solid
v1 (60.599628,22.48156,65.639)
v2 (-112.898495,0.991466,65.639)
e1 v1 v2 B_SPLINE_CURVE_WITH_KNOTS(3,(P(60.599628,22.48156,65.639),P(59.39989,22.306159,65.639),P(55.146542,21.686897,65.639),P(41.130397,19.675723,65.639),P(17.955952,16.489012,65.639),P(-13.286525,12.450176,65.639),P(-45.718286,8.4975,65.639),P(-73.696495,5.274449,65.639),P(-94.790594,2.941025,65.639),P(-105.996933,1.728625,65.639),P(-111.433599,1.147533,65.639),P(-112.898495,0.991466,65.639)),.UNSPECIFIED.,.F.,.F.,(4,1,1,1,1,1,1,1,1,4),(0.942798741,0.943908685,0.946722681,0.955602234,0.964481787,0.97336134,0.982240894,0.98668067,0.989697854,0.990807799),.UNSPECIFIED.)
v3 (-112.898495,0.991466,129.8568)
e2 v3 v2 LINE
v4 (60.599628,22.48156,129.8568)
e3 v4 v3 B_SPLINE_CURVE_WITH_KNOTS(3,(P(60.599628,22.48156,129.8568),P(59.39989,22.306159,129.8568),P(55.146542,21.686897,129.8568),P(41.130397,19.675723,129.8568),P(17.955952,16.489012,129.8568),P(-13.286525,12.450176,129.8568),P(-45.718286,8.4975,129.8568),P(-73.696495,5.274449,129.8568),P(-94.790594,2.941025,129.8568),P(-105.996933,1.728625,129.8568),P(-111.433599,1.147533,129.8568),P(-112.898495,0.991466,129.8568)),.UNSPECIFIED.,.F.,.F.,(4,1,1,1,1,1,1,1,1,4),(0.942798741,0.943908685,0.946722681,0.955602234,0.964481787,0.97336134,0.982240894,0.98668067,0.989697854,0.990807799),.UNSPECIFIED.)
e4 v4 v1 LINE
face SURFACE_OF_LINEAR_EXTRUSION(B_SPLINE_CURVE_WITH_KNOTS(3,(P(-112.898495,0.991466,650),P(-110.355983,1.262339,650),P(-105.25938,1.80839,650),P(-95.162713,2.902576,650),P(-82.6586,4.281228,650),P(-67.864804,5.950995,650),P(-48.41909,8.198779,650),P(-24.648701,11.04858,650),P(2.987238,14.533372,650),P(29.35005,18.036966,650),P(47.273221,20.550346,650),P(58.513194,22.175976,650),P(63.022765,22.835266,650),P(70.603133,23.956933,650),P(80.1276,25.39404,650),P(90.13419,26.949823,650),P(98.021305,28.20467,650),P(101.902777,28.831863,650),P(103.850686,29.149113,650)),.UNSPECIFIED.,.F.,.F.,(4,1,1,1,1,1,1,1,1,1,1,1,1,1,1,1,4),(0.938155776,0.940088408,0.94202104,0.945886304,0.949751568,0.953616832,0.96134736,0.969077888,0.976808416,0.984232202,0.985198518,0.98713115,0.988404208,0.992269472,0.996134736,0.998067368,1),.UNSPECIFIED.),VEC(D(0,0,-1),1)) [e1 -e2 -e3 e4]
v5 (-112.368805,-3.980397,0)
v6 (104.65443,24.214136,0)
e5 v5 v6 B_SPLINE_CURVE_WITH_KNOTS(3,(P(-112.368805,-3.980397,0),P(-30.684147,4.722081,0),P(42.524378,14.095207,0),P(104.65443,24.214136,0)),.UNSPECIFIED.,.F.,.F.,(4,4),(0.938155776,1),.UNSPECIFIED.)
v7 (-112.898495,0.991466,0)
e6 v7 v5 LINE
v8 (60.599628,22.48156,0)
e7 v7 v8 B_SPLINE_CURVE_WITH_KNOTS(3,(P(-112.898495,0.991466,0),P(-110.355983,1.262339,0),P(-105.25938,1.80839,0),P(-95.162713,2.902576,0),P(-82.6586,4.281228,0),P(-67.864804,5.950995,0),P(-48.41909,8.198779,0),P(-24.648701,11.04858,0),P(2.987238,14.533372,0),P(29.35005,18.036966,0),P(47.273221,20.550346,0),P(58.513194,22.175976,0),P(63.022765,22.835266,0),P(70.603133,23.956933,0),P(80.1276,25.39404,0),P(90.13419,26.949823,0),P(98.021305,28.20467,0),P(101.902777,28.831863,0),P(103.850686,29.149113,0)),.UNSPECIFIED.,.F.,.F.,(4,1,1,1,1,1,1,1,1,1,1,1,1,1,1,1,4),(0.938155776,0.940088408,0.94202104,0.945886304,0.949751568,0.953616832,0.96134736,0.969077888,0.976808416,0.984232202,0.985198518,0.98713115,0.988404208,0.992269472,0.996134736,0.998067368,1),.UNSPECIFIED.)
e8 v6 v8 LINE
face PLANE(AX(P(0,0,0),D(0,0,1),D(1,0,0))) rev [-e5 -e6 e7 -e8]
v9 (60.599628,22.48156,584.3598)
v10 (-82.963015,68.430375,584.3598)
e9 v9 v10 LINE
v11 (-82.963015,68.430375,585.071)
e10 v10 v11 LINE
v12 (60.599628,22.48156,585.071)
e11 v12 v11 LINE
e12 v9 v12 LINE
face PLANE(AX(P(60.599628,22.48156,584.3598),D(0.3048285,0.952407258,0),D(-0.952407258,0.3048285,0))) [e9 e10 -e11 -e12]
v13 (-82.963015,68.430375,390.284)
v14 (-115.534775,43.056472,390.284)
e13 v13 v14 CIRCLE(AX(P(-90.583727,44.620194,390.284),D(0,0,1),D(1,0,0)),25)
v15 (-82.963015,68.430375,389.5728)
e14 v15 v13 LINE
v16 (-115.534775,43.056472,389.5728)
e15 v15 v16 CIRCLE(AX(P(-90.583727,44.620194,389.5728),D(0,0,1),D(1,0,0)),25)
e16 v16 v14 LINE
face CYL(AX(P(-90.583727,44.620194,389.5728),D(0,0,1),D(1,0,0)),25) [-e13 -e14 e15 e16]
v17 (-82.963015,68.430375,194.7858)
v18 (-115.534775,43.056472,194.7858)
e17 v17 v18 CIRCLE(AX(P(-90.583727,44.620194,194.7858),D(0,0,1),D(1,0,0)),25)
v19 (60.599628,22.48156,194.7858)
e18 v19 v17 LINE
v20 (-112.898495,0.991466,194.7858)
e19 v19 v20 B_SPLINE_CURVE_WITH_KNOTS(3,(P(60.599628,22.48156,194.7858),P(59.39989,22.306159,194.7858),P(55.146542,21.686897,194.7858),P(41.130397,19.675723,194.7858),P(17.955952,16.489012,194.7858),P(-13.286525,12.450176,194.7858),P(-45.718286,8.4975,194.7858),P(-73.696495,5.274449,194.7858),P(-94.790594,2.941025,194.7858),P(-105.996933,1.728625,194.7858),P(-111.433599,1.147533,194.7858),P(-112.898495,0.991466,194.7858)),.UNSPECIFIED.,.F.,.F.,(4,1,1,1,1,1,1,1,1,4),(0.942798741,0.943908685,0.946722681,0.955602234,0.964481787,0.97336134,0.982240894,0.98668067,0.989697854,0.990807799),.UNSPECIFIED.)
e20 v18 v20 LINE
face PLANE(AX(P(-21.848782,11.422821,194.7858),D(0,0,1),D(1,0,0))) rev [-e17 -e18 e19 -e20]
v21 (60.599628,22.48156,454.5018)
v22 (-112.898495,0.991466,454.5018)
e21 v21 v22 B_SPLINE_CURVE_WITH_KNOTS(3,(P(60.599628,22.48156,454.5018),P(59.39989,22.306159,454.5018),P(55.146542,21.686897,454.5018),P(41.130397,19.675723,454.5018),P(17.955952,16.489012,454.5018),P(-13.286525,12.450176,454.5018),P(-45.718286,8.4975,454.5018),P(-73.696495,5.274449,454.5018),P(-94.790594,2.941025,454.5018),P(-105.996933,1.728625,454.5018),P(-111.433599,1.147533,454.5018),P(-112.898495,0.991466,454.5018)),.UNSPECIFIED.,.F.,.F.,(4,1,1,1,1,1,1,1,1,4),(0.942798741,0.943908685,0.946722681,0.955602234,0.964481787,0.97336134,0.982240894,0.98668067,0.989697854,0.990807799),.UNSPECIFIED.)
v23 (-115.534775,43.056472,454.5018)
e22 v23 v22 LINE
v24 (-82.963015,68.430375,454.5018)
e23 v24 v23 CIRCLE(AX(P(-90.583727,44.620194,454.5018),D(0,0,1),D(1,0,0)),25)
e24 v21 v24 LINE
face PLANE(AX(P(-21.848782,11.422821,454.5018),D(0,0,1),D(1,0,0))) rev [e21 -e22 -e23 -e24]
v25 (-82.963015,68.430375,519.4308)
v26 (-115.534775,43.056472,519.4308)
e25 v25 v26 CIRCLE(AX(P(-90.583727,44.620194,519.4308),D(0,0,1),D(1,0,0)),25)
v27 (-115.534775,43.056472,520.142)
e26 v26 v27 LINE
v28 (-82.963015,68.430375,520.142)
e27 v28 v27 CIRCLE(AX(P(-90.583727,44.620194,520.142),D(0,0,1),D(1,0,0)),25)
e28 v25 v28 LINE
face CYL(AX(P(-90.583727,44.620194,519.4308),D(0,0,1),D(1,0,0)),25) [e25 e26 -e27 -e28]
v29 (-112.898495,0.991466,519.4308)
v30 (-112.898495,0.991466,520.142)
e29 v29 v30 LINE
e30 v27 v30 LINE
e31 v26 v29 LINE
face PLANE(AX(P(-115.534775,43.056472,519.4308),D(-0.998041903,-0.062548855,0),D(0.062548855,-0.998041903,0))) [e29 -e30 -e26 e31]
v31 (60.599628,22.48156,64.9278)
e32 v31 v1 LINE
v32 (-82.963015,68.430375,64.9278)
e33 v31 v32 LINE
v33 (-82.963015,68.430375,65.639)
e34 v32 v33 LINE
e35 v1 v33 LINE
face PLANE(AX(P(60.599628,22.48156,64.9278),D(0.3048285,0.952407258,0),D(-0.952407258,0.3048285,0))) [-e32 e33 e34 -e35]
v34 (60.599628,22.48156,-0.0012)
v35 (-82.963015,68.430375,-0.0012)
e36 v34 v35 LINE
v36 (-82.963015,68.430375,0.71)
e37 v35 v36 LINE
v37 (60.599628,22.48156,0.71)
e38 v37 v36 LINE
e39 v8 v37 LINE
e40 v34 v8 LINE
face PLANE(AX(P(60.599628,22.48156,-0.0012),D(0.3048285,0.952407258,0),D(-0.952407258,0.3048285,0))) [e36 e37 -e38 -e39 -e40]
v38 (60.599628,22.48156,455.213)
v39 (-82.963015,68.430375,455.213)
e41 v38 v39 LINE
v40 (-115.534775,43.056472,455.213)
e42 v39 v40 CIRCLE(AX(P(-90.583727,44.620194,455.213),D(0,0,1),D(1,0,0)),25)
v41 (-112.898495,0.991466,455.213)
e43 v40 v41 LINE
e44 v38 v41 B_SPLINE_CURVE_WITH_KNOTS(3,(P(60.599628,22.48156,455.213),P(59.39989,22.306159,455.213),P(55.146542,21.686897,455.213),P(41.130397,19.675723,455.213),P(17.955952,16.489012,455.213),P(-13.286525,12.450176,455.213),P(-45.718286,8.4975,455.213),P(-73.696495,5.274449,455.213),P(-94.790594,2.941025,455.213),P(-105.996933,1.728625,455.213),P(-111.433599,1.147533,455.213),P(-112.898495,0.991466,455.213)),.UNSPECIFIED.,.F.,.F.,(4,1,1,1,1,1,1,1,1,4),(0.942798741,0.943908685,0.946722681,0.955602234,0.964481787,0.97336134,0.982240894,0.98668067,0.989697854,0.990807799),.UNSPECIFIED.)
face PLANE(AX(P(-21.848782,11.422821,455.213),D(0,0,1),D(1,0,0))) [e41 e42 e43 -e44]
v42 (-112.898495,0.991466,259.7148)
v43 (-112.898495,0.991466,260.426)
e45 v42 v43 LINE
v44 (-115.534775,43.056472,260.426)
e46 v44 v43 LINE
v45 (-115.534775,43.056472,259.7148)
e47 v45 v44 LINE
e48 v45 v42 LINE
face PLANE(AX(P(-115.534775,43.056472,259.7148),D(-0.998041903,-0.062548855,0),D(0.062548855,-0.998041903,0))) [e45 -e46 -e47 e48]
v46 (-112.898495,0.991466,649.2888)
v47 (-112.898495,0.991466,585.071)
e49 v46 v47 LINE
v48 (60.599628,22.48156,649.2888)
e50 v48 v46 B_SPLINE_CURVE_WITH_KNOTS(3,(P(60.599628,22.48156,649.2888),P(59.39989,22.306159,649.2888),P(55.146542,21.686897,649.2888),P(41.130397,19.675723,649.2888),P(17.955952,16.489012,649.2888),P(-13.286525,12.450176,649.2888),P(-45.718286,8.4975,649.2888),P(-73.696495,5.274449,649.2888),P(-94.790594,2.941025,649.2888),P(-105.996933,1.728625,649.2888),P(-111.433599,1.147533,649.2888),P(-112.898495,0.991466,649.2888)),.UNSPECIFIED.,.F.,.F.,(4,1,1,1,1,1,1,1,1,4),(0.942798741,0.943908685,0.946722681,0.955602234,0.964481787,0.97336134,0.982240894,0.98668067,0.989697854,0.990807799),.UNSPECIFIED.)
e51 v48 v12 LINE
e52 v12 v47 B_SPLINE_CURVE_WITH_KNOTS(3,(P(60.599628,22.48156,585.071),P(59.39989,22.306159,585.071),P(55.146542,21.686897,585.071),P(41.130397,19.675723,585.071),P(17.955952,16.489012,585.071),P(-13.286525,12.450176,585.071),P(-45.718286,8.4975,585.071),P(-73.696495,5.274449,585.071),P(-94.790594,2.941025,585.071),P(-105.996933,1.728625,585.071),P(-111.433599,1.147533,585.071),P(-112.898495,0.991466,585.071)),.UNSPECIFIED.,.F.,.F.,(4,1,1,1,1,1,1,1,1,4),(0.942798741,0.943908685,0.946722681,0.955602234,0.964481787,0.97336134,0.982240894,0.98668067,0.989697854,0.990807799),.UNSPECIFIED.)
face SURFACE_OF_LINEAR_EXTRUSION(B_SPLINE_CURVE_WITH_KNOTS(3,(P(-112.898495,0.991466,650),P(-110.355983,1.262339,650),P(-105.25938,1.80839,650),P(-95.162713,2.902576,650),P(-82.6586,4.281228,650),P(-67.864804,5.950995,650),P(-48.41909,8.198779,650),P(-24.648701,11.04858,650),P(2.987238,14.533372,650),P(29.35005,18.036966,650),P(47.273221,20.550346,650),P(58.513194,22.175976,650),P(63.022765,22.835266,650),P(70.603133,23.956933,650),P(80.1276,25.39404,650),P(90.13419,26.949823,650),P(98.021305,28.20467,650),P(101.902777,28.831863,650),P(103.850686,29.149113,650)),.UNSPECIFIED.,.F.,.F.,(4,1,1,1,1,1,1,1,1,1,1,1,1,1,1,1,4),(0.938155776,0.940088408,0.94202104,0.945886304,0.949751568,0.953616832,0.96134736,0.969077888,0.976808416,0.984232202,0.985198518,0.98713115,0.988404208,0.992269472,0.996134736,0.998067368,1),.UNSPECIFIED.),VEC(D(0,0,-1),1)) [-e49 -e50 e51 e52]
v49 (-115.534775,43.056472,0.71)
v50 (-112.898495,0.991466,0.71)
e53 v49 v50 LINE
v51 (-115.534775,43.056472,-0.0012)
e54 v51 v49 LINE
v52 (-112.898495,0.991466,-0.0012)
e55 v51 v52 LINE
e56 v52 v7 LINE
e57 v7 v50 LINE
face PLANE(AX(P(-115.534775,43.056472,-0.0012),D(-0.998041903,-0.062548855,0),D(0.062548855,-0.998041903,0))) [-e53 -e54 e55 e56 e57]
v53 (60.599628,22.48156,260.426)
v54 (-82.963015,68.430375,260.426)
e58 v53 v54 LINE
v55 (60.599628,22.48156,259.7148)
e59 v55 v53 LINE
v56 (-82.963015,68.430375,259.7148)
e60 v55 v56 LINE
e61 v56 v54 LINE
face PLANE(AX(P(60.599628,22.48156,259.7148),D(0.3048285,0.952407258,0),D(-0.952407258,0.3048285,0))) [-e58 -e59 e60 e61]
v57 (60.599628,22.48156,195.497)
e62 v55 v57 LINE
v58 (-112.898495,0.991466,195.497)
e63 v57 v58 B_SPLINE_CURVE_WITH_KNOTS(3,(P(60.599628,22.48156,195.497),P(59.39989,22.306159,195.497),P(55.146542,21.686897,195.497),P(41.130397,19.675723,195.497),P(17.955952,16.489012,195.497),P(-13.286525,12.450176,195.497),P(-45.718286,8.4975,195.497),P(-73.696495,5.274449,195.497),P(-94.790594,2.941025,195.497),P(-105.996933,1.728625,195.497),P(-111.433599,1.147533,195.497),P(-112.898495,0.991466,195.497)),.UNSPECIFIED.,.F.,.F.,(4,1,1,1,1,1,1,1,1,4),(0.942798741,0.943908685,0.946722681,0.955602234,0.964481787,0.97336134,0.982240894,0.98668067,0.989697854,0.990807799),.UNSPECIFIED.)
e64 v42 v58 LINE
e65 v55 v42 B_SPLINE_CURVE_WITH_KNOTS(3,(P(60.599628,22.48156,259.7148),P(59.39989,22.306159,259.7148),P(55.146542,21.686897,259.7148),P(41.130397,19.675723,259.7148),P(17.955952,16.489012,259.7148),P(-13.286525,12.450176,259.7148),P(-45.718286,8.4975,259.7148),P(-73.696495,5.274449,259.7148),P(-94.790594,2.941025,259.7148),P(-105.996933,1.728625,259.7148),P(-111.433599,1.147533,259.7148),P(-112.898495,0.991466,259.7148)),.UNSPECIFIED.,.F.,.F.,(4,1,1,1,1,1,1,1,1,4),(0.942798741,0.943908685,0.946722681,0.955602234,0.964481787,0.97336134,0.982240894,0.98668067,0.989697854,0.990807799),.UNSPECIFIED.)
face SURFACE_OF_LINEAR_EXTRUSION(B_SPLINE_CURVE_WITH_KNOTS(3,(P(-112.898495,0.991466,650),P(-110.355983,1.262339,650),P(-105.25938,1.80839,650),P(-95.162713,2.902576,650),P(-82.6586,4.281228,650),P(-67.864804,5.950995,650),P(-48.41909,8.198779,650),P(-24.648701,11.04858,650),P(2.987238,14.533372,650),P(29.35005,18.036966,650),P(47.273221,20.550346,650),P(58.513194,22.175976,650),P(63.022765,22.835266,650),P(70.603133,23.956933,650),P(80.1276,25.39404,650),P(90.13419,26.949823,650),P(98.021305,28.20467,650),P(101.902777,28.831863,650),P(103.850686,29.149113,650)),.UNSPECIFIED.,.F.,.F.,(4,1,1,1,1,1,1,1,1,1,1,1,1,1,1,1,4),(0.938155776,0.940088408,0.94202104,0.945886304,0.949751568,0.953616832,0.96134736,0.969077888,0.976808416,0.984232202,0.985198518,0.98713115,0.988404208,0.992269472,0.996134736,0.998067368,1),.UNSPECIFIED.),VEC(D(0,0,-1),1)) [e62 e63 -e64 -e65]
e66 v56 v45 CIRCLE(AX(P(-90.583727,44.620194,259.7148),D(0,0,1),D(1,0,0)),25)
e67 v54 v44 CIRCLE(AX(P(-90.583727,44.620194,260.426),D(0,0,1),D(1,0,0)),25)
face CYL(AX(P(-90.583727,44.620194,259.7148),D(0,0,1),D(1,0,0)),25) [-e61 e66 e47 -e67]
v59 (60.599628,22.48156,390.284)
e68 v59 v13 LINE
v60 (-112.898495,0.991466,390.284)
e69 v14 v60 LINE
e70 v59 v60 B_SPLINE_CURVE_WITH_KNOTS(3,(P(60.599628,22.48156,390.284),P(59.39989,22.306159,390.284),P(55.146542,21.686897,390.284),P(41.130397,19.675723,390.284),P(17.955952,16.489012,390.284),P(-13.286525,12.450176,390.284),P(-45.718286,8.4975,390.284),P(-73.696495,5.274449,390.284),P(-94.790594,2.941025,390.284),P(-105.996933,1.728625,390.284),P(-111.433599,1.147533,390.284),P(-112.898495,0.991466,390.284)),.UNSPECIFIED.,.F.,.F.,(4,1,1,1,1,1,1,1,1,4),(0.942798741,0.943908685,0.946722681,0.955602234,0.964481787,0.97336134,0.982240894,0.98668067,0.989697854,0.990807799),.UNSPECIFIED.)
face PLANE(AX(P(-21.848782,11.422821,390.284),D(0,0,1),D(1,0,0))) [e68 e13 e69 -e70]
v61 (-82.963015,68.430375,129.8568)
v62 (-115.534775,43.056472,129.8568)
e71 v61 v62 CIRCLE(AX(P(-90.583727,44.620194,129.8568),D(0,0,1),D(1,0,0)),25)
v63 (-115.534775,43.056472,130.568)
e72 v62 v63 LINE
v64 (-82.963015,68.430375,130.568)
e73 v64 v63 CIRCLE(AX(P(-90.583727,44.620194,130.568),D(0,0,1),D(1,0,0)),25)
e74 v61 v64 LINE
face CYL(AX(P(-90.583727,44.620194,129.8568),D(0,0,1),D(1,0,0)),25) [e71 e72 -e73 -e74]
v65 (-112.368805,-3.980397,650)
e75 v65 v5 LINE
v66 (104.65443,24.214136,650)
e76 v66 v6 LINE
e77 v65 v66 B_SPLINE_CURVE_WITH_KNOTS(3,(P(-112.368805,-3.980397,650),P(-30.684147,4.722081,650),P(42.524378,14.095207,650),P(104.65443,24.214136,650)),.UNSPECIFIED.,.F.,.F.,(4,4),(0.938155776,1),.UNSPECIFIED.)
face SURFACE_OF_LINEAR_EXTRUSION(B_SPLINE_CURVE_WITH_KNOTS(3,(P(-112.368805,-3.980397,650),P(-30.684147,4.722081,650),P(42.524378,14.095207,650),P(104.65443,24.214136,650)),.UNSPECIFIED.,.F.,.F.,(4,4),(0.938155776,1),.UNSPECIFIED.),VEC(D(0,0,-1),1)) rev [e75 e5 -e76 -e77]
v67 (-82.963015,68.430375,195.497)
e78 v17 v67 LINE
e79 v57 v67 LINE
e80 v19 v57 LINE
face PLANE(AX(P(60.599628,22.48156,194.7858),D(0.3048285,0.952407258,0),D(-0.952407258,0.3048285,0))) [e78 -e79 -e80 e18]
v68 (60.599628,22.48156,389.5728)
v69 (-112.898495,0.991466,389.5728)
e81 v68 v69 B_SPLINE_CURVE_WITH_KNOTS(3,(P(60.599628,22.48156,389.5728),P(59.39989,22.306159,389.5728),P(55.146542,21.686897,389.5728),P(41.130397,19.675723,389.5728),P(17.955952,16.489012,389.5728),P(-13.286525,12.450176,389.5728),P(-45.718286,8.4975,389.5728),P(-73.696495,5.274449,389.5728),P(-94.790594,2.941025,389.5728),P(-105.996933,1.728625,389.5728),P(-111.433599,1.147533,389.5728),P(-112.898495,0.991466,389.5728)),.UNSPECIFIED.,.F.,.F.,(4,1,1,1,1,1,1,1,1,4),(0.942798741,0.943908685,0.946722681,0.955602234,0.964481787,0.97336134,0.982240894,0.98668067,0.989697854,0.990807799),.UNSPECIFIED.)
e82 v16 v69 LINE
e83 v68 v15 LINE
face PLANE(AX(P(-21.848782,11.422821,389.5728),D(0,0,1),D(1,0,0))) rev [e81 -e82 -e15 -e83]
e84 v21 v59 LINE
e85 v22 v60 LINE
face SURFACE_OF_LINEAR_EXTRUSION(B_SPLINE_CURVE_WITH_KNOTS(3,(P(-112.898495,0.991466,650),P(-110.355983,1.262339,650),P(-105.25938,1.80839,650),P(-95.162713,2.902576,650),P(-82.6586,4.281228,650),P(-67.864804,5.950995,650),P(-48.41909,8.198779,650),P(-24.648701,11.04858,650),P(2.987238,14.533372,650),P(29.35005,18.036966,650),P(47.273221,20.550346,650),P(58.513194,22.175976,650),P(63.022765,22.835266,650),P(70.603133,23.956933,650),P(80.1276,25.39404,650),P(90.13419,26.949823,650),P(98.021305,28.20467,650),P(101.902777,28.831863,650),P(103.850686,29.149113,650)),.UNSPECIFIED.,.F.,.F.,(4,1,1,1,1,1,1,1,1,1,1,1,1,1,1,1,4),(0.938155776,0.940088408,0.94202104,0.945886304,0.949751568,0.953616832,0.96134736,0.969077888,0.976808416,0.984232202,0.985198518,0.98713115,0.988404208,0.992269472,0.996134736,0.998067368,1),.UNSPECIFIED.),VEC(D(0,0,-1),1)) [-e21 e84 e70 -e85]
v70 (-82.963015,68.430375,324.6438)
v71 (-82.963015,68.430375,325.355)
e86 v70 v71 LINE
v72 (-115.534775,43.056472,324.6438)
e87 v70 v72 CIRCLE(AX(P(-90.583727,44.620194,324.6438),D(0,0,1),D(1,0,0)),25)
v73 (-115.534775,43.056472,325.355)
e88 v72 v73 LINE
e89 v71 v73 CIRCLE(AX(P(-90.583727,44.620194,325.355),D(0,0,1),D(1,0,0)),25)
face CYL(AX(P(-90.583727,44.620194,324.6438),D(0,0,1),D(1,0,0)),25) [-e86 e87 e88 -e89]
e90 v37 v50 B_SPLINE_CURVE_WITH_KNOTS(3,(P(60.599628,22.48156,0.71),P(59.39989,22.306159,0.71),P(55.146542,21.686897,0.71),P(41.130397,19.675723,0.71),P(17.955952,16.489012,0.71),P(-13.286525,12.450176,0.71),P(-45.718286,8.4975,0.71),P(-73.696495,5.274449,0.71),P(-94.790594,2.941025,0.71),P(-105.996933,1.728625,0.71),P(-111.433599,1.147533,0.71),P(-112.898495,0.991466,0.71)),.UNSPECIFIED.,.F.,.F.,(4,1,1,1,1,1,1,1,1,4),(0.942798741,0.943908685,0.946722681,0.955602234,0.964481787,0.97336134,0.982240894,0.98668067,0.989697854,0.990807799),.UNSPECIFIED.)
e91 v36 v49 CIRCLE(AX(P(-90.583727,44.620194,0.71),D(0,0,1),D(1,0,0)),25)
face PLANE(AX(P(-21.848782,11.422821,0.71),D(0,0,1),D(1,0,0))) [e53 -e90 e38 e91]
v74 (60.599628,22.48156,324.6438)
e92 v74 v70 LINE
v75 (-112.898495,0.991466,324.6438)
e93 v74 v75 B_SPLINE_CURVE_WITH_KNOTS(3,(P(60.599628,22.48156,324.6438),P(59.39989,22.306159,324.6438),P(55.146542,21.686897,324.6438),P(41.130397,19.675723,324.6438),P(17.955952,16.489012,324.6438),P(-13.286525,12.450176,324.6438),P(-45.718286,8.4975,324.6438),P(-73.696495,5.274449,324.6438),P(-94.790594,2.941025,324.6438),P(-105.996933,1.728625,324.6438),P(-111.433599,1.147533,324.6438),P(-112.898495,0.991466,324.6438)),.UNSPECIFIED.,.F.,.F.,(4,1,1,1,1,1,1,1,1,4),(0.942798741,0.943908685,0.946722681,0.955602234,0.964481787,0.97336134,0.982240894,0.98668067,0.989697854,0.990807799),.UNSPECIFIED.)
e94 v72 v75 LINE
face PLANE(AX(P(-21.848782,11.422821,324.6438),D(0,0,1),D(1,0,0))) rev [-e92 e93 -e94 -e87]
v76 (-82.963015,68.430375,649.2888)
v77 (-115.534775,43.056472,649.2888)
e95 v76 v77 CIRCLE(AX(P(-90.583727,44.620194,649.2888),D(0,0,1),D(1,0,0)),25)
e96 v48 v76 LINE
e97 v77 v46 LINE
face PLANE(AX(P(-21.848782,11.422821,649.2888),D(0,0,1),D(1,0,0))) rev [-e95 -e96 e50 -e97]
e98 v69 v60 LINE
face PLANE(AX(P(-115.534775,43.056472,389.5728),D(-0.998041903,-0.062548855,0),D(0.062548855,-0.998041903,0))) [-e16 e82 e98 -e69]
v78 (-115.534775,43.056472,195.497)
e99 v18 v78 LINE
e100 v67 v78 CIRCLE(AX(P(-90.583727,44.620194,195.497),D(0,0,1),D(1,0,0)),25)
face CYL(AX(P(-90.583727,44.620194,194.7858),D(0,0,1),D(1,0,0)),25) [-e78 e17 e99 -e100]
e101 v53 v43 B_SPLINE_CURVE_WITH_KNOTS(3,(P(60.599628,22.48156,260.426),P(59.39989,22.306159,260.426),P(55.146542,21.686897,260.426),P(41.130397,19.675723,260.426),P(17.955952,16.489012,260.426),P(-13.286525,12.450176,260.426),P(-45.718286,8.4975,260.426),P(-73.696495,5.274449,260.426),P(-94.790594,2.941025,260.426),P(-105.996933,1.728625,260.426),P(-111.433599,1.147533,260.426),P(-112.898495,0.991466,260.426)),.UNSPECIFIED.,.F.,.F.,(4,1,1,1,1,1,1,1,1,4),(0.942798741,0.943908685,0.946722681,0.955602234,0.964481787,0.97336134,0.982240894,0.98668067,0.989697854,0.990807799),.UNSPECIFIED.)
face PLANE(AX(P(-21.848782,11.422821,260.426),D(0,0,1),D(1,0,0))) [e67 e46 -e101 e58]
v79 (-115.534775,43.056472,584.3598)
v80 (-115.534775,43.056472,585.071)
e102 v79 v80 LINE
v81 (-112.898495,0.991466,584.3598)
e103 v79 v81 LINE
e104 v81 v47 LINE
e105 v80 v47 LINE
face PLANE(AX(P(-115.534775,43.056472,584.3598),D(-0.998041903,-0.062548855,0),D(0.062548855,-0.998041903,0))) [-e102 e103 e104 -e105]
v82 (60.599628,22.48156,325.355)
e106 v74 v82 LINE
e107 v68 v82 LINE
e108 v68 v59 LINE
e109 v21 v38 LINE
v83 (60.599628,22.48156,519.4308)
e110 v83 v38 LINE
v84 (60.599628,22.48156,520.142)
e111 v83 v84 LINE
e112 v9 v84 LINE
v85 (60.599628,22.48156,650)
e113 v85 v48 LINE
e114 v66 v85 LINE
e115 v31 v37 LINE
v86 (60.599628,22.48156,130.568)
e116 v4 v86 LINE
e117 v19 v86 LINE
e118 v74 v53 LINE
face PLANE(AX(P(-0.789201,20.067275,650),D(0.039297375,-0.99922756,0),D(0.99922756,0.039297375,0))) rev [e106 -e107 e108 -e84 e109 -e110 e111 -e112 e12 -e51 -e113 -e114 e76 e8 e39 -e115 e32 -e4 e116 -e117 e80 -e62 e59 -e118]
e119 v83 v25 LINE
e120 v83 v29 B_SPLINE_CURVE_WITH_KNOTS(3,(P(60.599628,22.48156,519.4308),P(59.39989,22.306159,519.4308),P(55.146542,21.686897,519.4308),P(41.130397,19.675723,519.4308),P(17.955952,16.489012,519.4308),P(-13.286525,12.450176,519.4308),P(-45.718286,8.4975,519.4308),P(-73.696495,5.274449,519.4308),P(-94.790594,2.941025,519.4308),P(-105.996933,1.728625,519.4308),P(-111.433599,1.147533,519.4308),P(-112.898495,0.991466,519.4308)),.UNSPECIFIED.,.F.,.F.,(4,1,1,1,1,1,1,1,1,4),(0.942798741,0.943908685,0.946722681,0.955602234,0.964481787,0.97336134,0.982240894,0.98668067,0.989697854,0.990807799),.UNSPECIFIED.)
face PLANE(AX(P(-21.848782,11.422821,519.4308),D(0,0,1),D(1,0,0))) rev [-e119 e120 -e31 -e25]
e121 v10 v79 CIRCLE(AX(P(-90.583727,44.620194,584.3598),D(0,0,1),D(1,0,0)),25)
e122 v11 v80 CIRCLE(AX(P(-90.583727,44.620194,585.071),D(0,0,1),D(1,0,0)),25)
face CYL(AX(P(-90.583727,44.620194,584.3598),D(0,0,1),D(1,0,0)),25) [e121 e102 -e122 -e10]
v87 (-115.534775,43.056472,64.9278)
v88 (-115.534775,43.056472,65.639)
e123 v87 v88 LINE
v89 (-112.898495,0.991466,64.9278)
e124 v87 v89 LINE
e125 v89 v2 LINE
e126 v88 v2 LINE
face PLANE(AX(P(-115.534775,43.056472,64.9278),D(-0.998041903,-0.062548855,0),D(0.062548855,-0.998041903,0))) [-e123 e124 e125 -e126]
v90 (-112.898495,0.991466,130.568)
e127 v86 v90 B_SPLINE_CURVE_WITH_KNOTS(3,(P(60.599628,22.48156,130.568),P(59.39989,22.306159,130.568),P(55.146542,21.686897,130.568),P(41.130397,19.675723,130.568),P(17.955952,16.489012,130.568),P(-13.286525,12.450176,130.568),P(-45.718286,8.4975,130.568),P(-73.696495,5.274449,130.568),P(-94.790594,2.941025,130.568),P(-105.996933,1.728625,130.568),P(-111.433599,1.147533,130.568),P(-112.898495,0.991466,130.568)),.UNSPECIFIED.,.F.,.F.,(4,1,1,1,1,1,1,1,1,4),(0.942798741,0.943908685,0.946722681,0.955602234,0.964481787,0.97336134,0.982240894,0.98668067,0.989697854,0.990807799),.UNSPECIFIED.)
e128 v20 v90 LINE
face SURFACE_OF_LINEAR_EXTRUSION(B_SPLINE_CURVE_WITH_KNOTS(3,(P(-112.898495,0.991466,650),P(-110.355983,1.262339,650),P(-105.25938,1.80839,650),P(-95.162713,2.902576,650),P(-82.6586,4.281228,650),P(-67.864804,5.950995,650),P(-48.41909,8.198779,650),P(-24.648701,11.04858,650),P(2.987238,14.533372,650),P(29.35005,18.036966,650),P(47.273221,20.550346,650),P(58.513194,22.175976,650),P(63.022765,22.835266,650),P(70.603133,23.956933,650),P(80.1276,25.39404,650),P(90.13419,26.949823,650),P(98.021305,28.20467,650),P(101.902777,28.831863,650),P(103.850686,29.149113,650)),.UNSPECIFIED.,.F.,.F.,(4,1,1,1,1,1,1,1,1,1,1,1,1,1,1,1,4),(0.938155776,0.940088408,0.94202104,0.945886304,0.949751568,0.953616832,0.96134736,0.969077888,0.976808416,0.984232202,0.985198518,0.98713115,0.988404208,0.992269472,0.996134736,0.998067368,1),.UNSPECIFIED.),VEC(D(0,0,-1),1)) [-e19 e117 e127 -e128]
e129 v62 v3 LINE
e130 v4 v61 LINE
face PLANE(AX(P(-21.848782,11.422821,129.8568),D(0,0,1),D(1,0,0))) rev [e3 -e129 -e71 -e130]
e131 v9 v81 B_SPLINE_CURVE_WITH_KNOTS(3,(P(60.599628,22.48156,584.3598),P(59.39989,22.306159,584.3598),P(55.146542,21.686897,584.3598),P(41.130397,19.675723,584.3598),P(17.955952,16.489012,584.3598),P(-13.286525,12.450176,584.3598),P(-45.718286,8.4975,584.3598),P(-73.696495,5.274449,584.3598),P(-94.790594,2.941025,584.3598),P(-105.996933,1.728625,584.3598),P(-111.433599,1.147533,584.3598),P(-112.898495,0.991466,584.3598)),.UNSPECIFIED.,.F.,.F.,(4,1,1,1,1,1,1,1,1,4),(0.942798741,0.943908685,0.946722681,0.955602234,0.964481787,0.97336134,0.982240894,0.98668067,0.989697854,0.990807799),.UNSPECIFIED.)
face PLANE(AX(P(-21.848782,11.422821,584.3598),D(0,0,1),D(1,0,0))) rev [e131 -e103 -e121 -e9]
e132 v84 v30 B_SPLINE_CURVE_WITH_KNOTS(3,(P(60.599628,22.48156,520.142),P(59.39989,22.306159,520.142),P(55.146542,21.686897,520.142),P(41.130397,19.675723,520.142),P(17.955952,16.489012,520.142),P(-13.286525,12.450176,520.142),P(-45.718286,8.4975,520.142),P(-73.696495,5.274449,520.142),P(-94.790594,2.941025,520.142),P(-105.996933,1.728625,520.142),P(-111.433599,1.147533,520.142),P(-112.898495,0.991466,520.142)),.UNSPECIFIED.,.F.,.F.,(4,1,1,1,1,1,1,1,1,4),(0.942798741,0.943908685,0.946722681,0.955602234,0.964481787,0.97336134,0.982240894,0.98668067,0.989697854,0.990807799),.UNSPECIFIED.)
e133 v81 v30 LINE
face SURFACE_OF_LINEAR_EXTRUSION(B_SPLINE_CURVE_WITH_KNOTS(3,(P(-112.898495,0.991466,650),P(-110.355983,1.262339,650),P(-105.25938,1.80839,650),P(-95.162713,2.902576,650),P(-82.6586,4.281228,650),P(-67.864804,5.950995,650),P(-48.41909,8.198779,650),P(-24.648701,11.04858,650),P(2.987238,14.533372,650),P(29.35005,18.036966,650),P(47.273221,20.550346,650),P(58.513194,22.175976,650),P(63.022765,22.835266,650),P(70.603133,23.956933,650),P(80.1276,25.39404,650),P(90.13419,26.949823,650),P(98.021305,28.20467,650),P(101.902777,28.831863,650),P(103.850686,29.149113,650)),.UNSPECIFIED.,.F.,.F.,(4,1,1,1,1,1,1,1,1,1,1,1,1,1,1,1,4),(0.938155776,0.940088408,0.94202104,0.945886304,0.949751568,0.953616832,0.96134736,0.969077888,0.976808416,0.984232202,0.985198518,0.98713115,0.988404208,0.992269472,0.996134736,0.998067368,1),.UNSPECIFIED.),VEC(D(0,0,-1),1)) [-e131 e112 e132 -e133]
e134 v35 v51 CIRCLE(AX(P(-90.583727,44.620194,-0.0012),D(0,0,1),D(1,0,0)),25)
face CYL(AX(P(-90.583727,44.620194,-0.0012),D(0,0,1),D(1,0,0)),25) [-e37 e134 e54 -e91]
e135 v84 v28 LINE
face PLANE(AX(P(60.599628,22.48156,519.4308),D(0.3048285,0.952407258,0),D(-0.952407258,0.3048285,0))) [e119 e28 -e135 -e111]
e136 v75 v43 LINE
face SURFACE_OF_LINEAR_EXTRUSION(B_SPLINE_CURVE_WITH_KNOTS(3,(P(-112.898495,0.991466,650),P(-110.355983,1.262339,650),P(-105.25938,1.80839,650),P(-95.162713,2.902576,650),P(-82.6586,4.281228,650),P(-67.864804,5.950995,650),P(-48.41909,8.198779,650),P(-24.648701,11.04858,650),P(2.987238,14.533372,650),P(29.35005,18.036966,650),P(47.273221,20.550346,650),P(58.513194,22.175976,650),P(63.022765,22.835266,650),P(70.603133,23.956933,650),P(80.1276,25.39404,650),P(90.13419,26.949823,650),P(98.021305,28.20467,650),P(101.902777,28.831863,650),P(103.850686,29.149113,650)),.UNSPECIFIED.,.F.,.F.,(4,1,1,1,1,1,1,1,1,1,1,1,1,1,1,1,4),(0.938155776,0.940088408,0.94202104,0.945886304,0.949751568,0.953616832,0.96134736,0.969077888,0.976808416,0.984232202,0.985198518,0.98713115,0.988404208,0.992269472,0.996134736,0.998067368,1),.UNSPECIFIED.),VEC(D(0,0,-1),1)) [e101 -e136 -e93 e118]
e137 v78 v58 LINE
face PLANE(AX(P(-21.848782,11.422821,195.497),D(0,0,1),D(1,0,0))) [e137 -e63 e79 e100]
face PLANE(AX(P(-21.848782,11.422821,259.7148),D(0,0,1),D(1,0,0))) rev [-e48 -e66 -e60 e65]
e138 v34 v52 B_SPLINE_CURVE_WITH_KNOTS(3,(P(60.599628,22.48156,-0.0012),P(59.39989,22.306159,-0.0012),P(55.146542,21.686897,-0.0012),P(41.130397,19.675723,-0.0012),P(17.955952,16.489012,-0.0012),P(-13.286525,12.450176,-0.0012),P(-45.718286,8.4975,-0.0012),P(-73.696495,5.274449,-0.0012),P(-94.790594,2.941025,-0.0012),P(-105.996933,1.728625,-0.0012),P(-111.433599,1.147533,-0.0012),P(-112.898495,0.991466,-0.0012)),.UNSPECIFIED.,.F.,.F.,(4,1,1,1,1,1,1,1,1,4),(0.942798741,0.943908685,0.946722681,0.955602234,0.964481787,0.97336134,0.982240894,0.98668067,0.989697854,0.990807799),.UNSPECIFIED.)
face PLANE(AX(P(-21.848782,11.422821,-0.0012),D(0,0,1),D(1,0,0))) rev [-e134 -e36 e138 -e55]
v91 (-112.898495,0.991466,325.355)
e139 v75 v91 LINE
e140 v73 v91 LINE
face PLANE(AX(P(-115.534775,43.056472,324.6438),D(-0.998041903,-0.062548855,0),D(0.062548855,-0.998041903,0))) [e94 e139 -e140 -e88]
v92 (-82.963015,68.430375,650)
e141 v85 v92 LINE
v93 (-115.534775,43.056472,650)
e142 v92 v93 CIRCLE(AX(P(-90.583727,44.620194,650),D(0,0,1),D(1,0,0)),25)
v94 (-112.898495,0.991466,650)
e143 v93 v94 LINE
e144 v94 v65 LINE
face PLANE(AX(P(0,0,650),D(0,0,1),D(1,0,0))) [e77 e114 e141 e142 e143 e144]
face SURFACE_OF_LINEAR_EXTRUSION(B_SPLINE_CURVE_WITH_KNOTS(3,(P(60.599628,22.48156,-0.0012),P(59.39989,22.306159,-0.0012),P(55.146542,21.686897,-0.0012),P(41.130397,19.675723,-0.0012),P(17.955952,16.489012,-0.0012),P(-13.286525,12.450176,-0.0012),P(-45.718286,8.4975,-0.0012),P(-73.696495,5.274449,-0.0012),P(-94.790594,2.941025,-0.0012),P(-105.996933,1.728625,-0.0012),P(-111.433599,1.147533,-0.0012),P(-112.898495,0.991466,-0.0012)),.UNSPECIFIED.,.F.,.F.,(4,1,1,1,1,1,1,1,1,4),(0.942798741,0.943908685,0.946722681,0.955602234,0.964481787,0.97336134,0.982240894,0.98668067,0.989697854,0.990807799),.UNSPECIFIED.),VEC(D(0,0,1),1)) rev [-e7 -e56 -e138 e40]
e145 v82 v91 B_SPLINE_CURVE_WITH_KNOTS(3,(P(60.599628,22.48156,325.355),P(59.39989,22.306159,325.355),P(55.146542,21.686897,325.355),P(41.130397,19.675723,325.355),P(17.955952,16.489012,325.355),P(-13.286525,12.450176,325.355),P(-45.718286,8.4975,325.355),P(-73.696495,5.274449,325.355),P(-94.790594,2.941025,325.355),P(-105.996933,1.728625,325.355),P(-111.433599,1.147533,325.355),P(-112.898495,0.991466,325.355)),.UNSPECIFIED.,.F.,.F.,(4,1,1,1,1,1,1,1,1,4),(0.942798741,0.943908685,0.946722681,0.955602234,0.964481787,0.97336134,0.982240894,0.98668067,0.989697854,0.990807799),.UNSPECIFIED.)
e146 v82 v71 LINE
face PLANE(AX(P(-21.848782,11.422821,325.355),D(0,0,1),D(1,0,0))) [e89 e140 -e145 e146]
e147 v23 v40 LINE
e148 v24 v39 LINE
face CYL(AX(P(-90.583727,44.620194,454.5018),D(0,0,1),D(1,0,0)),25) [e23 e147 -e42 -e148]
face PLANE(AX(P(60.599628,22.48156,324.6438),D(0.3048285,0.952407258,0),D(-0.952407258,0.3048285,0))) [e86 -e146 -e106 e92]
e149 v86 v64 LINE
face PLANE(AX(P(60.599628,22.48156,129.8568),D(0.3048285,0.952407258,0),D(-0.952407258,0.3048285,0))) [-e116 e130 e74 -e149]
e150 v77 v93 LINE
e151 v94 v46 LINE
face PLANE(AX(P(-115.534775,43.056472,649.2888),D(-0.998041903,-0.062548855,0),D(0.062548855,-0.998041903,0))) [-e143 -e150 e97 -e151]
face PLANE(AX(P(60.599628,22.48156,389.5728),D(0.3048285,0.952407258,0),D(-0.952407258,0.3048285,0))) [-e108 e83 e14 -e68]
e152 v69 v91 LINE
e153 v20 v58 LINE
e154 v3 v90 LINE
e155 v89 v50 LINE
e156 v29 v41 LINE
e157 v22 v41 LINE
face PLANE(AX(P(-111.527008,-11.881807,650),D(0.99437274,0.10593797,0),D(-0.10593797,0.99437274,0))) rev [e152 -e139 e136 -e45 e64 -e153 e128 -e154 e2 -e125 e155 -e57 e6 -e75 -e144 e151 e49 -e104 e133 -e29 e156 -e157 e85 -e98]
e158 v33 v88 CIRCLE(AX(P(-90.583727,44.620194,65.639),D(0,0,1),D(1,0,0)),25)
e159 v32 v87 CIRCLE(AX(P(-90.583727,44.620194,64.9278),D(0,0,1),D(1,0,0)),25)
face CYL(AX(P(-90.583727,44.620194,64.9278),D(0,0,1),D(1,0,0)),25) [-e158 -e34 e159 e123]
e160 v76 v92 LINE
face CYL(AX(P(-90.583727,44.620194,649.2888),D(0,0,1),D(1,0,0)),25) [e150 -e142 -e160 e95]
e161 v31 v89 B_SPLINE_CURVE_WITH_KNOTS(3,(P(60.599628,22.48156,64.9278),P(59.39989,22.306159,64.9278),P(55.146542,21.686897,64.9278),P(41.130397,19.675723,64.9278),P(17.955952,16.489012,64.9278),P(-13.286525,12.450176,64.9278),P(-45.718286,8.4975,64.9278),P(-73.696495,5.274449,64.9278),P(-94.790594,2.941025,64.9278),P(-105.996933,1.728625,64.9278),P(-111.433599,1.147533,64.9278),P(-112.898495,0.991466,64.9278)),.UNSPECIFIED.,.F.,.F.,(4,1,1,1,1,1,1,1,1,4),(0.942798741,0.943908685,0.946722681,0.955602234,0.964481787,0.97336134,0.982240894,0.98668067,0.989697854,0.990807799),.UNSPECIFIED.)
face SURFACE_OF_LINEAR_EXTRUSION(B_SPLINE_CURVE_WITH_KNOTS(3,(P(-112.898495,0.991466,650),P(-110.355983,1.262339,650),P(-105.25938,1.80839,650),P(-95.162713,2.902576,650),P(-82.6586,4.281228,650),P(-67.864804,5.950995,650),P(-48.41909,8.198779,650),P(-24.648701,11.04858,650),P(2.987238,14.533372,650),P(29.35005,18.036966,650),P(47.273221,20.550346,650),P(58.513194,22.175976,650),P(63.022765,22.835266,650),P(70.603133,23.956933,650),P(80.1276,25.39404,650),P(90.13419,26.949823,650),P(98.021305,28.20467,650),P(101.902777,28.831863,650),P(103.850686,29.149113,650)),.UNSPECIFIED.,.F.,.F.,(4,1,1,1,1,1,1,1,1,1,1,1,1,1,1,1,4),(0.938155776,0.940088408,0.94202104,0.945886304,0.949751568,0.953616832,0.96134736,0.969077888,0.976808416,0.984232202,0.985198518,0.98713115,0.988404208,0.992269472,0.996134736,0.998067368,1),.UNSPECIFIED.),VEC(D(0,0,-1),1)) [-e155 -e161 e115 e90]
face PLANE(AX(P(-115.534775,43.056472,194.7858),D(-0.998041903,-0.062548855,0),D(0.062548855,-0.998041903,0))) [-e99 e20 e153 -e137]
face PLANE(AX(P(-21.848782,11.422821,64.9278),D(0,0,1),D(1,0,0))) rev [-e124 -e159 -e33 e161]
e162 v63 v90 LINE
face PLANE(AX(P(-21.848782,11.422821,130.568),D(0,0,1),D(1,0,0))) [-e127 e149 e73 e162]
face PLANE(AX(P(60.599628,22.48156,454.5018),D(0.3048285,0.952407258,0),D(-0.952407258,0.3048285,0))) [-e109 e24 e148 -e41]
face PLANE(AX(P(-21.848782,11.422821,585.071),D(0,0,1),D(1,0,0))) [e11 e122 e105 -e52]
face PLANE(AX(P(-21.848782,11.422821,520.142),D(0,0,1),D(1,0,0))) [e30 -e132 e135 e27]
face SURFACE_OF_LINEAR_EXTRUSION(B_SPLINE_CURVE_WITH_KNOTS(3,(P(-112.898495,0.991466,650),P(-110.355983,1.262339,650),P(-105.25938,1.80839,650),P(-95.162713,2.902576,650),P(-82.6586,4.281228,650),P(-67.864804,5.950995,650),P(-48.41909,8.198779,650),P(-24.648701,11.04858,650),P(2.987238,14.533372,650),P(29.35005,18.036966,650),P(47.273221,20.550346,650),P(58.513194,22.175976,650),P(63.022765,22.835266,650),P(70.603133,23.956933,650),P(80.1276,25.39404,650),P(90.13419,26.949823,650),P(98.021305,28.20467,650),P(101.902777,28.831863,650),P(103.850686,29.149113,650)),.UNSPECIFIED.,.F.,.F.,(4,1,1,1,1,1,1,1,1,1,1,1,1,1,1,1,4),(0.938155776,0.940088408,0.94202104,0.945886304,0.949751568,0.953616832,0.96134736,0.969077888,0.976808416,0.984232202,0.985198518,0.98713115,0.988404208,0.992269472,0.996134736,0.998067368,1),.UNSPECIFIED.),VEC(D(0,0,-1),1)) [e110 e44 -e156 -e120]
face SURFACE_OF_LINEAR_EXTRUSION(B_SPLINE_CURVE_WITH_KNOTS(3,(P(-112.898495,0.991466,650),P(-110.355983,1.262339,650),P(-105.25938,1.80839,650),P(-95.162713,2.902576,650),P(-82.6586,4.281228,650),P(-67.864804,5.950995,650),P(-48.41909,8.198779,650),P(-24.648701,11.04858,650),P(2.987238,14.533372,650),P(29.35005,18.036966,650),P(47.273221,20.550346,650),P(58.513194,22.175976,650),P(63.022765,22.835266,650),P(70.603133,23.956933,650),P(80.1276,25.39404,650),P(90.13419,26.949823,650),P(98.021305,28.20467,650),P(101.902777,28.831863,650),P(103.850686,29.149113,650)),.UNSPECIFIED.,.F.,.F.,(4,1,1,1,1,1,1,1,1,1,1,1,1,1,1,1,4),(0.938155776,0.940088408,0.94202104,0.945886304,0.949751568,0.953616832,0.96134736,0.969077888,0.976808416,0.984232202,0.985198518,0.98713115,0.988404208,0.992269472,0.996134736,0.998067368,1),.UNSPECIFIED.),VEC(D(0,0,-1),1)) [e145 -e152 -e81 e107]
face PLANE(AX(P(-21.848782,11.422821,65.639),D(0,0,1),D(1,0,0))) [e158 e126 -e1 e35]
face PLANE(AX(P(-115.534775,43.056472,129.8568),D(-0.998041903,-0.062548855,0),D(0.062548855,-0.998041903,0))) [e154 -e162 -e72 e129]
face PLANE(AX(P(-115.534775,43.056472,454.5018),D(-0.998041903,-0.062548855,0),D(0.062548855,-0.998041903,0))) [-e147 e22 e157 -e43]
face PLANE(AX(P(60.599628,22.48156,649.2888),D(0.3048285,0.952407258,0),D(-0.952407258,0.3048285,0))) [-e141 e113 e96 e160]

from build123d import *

# Parameters (mm, degrees)
BOSS_EXTRUDE1_DEPTH = 650
BOSS_EXTRUDE2_START = -0.7112
BOSS_EXTRUDE2_DEPTH = 0.7112
LPATTERN1_COUNT     = 11
LPATTERN1_PITCH     = 64.929


# Read off the part's stored shape, not the designer's step: Boss-Extrude2
with BuildPart() as part:
    # Sketch1 → Boss-Extrude1 (new body)
    with BuildSketch(Plane.XY):
        with BuildLine():
            add(Edge.make_bspline(
                [(-112.898494578, 0.99146631), (-110.355982987, 1.262339099), (-105.259380368, 1.808389528), (-95.162712882, 2.902575782), (-82.658600361, 4.281227817), (-67.864804262, 5.950995414), (-48.419089864, 8.198779354), (-24.648701462, 11.048580313), (2.987237789, 14.533371756), (29.350050206, 18.036965667), (47.273220771, 20.55034649), (57.461014612, 22.023800415), (59.555137323, 22.328856294), (60.599627559, 22.481560095)],
                knots=[0.938155776, 0.938155776, 0.938155776, 0.938155776, 0.940088408, 0.94202104, 0.945886304, 0.949751568, 0.953616832, 0.96134736, 0.969077888, 0.976808416, 0.984232202, 0.985198518, 0.986164834, 0.986164834, 0.986164834, 0.986164834], degree=3))
            Line((60.599627559, 22.481560095), (104.654430058, 24.21413648))
            add(Edge.make_bspline(
                [(-112.368804727, -3.980397391), (-30.684146875, 4.722080559), (42.524377626, 14.095206887), (104.654430058, 24.21413648)],
                knots=[0.938155776, 0.938155776, 0.938155776, 0.938155776, 1, 1, 1, 1], degree=3))
            Line((-112.368804727, -3.980397391), (-112.898494578, 0.99146631))
        make_face()
    extrude(amount=BOSS_EXTRUDE1_DEPTH)

    # Boss-Extrude2 outline → Boss-Extrude2 (add)
    with BuildSketch(Plane.XY.offset(650).offset(BOSS_EXTRUDE2_START)):
        with BuildLine():
            ThreePointArc((-82.963014518, 68.430375082), (-105.947446125, 64.342164511), (-115.534774611, 43.056472263))
            Line((-115.534774611, 43.056472263), (-112.898494578, 0.99146631))
            add(Edge.make_bspline(
                [(-112.898494578, 0.99146631), (-110.355982987, 1.262339099), (-105.259380368, 1.808389528), (-95.162712882, 2.902575782), (-82.658600361, 4.281227817), (-67.864804262, 5.950995414), (-48.419089864, 8.198779354), (-24.648701462, 11.048580313), (2.987237789, 14.533371756), (29.350050206, 18.036965667), (47.273220771, 20.55034649), (57.461014612, 22.023800415), (59.555137323, 22.328856294), (60.599627559, 22.481560095)],
                knots=[0.938155776, 0.938155776, 0.938155776, 0.938155776, 0.940088408, 0.94202104, 0.945886304, 0.949751568, 0.953616832, 0.96134736, 0.969077888, 0.976808416, 0.984232202, 0.985198518, 0.986164834, 0.986164834, 0.986164834, 0.986164834], degree=3))
            Line((60.599627559, 22.481560095), (-82.963014518, 68.430375082))
        make_face()
    boss_extrude2 = extrude(amount=BOSS_EXTRUDE2_DEPTH)

    # LPattern1: Boss-Extrude2 ×11
    with Locations(*[(0, 0, -i * LPATTERN1_PITCH) for i in range(1, LPATTERN1_COUNT)]):
        add(boss_extrude2)


solid = part.part
